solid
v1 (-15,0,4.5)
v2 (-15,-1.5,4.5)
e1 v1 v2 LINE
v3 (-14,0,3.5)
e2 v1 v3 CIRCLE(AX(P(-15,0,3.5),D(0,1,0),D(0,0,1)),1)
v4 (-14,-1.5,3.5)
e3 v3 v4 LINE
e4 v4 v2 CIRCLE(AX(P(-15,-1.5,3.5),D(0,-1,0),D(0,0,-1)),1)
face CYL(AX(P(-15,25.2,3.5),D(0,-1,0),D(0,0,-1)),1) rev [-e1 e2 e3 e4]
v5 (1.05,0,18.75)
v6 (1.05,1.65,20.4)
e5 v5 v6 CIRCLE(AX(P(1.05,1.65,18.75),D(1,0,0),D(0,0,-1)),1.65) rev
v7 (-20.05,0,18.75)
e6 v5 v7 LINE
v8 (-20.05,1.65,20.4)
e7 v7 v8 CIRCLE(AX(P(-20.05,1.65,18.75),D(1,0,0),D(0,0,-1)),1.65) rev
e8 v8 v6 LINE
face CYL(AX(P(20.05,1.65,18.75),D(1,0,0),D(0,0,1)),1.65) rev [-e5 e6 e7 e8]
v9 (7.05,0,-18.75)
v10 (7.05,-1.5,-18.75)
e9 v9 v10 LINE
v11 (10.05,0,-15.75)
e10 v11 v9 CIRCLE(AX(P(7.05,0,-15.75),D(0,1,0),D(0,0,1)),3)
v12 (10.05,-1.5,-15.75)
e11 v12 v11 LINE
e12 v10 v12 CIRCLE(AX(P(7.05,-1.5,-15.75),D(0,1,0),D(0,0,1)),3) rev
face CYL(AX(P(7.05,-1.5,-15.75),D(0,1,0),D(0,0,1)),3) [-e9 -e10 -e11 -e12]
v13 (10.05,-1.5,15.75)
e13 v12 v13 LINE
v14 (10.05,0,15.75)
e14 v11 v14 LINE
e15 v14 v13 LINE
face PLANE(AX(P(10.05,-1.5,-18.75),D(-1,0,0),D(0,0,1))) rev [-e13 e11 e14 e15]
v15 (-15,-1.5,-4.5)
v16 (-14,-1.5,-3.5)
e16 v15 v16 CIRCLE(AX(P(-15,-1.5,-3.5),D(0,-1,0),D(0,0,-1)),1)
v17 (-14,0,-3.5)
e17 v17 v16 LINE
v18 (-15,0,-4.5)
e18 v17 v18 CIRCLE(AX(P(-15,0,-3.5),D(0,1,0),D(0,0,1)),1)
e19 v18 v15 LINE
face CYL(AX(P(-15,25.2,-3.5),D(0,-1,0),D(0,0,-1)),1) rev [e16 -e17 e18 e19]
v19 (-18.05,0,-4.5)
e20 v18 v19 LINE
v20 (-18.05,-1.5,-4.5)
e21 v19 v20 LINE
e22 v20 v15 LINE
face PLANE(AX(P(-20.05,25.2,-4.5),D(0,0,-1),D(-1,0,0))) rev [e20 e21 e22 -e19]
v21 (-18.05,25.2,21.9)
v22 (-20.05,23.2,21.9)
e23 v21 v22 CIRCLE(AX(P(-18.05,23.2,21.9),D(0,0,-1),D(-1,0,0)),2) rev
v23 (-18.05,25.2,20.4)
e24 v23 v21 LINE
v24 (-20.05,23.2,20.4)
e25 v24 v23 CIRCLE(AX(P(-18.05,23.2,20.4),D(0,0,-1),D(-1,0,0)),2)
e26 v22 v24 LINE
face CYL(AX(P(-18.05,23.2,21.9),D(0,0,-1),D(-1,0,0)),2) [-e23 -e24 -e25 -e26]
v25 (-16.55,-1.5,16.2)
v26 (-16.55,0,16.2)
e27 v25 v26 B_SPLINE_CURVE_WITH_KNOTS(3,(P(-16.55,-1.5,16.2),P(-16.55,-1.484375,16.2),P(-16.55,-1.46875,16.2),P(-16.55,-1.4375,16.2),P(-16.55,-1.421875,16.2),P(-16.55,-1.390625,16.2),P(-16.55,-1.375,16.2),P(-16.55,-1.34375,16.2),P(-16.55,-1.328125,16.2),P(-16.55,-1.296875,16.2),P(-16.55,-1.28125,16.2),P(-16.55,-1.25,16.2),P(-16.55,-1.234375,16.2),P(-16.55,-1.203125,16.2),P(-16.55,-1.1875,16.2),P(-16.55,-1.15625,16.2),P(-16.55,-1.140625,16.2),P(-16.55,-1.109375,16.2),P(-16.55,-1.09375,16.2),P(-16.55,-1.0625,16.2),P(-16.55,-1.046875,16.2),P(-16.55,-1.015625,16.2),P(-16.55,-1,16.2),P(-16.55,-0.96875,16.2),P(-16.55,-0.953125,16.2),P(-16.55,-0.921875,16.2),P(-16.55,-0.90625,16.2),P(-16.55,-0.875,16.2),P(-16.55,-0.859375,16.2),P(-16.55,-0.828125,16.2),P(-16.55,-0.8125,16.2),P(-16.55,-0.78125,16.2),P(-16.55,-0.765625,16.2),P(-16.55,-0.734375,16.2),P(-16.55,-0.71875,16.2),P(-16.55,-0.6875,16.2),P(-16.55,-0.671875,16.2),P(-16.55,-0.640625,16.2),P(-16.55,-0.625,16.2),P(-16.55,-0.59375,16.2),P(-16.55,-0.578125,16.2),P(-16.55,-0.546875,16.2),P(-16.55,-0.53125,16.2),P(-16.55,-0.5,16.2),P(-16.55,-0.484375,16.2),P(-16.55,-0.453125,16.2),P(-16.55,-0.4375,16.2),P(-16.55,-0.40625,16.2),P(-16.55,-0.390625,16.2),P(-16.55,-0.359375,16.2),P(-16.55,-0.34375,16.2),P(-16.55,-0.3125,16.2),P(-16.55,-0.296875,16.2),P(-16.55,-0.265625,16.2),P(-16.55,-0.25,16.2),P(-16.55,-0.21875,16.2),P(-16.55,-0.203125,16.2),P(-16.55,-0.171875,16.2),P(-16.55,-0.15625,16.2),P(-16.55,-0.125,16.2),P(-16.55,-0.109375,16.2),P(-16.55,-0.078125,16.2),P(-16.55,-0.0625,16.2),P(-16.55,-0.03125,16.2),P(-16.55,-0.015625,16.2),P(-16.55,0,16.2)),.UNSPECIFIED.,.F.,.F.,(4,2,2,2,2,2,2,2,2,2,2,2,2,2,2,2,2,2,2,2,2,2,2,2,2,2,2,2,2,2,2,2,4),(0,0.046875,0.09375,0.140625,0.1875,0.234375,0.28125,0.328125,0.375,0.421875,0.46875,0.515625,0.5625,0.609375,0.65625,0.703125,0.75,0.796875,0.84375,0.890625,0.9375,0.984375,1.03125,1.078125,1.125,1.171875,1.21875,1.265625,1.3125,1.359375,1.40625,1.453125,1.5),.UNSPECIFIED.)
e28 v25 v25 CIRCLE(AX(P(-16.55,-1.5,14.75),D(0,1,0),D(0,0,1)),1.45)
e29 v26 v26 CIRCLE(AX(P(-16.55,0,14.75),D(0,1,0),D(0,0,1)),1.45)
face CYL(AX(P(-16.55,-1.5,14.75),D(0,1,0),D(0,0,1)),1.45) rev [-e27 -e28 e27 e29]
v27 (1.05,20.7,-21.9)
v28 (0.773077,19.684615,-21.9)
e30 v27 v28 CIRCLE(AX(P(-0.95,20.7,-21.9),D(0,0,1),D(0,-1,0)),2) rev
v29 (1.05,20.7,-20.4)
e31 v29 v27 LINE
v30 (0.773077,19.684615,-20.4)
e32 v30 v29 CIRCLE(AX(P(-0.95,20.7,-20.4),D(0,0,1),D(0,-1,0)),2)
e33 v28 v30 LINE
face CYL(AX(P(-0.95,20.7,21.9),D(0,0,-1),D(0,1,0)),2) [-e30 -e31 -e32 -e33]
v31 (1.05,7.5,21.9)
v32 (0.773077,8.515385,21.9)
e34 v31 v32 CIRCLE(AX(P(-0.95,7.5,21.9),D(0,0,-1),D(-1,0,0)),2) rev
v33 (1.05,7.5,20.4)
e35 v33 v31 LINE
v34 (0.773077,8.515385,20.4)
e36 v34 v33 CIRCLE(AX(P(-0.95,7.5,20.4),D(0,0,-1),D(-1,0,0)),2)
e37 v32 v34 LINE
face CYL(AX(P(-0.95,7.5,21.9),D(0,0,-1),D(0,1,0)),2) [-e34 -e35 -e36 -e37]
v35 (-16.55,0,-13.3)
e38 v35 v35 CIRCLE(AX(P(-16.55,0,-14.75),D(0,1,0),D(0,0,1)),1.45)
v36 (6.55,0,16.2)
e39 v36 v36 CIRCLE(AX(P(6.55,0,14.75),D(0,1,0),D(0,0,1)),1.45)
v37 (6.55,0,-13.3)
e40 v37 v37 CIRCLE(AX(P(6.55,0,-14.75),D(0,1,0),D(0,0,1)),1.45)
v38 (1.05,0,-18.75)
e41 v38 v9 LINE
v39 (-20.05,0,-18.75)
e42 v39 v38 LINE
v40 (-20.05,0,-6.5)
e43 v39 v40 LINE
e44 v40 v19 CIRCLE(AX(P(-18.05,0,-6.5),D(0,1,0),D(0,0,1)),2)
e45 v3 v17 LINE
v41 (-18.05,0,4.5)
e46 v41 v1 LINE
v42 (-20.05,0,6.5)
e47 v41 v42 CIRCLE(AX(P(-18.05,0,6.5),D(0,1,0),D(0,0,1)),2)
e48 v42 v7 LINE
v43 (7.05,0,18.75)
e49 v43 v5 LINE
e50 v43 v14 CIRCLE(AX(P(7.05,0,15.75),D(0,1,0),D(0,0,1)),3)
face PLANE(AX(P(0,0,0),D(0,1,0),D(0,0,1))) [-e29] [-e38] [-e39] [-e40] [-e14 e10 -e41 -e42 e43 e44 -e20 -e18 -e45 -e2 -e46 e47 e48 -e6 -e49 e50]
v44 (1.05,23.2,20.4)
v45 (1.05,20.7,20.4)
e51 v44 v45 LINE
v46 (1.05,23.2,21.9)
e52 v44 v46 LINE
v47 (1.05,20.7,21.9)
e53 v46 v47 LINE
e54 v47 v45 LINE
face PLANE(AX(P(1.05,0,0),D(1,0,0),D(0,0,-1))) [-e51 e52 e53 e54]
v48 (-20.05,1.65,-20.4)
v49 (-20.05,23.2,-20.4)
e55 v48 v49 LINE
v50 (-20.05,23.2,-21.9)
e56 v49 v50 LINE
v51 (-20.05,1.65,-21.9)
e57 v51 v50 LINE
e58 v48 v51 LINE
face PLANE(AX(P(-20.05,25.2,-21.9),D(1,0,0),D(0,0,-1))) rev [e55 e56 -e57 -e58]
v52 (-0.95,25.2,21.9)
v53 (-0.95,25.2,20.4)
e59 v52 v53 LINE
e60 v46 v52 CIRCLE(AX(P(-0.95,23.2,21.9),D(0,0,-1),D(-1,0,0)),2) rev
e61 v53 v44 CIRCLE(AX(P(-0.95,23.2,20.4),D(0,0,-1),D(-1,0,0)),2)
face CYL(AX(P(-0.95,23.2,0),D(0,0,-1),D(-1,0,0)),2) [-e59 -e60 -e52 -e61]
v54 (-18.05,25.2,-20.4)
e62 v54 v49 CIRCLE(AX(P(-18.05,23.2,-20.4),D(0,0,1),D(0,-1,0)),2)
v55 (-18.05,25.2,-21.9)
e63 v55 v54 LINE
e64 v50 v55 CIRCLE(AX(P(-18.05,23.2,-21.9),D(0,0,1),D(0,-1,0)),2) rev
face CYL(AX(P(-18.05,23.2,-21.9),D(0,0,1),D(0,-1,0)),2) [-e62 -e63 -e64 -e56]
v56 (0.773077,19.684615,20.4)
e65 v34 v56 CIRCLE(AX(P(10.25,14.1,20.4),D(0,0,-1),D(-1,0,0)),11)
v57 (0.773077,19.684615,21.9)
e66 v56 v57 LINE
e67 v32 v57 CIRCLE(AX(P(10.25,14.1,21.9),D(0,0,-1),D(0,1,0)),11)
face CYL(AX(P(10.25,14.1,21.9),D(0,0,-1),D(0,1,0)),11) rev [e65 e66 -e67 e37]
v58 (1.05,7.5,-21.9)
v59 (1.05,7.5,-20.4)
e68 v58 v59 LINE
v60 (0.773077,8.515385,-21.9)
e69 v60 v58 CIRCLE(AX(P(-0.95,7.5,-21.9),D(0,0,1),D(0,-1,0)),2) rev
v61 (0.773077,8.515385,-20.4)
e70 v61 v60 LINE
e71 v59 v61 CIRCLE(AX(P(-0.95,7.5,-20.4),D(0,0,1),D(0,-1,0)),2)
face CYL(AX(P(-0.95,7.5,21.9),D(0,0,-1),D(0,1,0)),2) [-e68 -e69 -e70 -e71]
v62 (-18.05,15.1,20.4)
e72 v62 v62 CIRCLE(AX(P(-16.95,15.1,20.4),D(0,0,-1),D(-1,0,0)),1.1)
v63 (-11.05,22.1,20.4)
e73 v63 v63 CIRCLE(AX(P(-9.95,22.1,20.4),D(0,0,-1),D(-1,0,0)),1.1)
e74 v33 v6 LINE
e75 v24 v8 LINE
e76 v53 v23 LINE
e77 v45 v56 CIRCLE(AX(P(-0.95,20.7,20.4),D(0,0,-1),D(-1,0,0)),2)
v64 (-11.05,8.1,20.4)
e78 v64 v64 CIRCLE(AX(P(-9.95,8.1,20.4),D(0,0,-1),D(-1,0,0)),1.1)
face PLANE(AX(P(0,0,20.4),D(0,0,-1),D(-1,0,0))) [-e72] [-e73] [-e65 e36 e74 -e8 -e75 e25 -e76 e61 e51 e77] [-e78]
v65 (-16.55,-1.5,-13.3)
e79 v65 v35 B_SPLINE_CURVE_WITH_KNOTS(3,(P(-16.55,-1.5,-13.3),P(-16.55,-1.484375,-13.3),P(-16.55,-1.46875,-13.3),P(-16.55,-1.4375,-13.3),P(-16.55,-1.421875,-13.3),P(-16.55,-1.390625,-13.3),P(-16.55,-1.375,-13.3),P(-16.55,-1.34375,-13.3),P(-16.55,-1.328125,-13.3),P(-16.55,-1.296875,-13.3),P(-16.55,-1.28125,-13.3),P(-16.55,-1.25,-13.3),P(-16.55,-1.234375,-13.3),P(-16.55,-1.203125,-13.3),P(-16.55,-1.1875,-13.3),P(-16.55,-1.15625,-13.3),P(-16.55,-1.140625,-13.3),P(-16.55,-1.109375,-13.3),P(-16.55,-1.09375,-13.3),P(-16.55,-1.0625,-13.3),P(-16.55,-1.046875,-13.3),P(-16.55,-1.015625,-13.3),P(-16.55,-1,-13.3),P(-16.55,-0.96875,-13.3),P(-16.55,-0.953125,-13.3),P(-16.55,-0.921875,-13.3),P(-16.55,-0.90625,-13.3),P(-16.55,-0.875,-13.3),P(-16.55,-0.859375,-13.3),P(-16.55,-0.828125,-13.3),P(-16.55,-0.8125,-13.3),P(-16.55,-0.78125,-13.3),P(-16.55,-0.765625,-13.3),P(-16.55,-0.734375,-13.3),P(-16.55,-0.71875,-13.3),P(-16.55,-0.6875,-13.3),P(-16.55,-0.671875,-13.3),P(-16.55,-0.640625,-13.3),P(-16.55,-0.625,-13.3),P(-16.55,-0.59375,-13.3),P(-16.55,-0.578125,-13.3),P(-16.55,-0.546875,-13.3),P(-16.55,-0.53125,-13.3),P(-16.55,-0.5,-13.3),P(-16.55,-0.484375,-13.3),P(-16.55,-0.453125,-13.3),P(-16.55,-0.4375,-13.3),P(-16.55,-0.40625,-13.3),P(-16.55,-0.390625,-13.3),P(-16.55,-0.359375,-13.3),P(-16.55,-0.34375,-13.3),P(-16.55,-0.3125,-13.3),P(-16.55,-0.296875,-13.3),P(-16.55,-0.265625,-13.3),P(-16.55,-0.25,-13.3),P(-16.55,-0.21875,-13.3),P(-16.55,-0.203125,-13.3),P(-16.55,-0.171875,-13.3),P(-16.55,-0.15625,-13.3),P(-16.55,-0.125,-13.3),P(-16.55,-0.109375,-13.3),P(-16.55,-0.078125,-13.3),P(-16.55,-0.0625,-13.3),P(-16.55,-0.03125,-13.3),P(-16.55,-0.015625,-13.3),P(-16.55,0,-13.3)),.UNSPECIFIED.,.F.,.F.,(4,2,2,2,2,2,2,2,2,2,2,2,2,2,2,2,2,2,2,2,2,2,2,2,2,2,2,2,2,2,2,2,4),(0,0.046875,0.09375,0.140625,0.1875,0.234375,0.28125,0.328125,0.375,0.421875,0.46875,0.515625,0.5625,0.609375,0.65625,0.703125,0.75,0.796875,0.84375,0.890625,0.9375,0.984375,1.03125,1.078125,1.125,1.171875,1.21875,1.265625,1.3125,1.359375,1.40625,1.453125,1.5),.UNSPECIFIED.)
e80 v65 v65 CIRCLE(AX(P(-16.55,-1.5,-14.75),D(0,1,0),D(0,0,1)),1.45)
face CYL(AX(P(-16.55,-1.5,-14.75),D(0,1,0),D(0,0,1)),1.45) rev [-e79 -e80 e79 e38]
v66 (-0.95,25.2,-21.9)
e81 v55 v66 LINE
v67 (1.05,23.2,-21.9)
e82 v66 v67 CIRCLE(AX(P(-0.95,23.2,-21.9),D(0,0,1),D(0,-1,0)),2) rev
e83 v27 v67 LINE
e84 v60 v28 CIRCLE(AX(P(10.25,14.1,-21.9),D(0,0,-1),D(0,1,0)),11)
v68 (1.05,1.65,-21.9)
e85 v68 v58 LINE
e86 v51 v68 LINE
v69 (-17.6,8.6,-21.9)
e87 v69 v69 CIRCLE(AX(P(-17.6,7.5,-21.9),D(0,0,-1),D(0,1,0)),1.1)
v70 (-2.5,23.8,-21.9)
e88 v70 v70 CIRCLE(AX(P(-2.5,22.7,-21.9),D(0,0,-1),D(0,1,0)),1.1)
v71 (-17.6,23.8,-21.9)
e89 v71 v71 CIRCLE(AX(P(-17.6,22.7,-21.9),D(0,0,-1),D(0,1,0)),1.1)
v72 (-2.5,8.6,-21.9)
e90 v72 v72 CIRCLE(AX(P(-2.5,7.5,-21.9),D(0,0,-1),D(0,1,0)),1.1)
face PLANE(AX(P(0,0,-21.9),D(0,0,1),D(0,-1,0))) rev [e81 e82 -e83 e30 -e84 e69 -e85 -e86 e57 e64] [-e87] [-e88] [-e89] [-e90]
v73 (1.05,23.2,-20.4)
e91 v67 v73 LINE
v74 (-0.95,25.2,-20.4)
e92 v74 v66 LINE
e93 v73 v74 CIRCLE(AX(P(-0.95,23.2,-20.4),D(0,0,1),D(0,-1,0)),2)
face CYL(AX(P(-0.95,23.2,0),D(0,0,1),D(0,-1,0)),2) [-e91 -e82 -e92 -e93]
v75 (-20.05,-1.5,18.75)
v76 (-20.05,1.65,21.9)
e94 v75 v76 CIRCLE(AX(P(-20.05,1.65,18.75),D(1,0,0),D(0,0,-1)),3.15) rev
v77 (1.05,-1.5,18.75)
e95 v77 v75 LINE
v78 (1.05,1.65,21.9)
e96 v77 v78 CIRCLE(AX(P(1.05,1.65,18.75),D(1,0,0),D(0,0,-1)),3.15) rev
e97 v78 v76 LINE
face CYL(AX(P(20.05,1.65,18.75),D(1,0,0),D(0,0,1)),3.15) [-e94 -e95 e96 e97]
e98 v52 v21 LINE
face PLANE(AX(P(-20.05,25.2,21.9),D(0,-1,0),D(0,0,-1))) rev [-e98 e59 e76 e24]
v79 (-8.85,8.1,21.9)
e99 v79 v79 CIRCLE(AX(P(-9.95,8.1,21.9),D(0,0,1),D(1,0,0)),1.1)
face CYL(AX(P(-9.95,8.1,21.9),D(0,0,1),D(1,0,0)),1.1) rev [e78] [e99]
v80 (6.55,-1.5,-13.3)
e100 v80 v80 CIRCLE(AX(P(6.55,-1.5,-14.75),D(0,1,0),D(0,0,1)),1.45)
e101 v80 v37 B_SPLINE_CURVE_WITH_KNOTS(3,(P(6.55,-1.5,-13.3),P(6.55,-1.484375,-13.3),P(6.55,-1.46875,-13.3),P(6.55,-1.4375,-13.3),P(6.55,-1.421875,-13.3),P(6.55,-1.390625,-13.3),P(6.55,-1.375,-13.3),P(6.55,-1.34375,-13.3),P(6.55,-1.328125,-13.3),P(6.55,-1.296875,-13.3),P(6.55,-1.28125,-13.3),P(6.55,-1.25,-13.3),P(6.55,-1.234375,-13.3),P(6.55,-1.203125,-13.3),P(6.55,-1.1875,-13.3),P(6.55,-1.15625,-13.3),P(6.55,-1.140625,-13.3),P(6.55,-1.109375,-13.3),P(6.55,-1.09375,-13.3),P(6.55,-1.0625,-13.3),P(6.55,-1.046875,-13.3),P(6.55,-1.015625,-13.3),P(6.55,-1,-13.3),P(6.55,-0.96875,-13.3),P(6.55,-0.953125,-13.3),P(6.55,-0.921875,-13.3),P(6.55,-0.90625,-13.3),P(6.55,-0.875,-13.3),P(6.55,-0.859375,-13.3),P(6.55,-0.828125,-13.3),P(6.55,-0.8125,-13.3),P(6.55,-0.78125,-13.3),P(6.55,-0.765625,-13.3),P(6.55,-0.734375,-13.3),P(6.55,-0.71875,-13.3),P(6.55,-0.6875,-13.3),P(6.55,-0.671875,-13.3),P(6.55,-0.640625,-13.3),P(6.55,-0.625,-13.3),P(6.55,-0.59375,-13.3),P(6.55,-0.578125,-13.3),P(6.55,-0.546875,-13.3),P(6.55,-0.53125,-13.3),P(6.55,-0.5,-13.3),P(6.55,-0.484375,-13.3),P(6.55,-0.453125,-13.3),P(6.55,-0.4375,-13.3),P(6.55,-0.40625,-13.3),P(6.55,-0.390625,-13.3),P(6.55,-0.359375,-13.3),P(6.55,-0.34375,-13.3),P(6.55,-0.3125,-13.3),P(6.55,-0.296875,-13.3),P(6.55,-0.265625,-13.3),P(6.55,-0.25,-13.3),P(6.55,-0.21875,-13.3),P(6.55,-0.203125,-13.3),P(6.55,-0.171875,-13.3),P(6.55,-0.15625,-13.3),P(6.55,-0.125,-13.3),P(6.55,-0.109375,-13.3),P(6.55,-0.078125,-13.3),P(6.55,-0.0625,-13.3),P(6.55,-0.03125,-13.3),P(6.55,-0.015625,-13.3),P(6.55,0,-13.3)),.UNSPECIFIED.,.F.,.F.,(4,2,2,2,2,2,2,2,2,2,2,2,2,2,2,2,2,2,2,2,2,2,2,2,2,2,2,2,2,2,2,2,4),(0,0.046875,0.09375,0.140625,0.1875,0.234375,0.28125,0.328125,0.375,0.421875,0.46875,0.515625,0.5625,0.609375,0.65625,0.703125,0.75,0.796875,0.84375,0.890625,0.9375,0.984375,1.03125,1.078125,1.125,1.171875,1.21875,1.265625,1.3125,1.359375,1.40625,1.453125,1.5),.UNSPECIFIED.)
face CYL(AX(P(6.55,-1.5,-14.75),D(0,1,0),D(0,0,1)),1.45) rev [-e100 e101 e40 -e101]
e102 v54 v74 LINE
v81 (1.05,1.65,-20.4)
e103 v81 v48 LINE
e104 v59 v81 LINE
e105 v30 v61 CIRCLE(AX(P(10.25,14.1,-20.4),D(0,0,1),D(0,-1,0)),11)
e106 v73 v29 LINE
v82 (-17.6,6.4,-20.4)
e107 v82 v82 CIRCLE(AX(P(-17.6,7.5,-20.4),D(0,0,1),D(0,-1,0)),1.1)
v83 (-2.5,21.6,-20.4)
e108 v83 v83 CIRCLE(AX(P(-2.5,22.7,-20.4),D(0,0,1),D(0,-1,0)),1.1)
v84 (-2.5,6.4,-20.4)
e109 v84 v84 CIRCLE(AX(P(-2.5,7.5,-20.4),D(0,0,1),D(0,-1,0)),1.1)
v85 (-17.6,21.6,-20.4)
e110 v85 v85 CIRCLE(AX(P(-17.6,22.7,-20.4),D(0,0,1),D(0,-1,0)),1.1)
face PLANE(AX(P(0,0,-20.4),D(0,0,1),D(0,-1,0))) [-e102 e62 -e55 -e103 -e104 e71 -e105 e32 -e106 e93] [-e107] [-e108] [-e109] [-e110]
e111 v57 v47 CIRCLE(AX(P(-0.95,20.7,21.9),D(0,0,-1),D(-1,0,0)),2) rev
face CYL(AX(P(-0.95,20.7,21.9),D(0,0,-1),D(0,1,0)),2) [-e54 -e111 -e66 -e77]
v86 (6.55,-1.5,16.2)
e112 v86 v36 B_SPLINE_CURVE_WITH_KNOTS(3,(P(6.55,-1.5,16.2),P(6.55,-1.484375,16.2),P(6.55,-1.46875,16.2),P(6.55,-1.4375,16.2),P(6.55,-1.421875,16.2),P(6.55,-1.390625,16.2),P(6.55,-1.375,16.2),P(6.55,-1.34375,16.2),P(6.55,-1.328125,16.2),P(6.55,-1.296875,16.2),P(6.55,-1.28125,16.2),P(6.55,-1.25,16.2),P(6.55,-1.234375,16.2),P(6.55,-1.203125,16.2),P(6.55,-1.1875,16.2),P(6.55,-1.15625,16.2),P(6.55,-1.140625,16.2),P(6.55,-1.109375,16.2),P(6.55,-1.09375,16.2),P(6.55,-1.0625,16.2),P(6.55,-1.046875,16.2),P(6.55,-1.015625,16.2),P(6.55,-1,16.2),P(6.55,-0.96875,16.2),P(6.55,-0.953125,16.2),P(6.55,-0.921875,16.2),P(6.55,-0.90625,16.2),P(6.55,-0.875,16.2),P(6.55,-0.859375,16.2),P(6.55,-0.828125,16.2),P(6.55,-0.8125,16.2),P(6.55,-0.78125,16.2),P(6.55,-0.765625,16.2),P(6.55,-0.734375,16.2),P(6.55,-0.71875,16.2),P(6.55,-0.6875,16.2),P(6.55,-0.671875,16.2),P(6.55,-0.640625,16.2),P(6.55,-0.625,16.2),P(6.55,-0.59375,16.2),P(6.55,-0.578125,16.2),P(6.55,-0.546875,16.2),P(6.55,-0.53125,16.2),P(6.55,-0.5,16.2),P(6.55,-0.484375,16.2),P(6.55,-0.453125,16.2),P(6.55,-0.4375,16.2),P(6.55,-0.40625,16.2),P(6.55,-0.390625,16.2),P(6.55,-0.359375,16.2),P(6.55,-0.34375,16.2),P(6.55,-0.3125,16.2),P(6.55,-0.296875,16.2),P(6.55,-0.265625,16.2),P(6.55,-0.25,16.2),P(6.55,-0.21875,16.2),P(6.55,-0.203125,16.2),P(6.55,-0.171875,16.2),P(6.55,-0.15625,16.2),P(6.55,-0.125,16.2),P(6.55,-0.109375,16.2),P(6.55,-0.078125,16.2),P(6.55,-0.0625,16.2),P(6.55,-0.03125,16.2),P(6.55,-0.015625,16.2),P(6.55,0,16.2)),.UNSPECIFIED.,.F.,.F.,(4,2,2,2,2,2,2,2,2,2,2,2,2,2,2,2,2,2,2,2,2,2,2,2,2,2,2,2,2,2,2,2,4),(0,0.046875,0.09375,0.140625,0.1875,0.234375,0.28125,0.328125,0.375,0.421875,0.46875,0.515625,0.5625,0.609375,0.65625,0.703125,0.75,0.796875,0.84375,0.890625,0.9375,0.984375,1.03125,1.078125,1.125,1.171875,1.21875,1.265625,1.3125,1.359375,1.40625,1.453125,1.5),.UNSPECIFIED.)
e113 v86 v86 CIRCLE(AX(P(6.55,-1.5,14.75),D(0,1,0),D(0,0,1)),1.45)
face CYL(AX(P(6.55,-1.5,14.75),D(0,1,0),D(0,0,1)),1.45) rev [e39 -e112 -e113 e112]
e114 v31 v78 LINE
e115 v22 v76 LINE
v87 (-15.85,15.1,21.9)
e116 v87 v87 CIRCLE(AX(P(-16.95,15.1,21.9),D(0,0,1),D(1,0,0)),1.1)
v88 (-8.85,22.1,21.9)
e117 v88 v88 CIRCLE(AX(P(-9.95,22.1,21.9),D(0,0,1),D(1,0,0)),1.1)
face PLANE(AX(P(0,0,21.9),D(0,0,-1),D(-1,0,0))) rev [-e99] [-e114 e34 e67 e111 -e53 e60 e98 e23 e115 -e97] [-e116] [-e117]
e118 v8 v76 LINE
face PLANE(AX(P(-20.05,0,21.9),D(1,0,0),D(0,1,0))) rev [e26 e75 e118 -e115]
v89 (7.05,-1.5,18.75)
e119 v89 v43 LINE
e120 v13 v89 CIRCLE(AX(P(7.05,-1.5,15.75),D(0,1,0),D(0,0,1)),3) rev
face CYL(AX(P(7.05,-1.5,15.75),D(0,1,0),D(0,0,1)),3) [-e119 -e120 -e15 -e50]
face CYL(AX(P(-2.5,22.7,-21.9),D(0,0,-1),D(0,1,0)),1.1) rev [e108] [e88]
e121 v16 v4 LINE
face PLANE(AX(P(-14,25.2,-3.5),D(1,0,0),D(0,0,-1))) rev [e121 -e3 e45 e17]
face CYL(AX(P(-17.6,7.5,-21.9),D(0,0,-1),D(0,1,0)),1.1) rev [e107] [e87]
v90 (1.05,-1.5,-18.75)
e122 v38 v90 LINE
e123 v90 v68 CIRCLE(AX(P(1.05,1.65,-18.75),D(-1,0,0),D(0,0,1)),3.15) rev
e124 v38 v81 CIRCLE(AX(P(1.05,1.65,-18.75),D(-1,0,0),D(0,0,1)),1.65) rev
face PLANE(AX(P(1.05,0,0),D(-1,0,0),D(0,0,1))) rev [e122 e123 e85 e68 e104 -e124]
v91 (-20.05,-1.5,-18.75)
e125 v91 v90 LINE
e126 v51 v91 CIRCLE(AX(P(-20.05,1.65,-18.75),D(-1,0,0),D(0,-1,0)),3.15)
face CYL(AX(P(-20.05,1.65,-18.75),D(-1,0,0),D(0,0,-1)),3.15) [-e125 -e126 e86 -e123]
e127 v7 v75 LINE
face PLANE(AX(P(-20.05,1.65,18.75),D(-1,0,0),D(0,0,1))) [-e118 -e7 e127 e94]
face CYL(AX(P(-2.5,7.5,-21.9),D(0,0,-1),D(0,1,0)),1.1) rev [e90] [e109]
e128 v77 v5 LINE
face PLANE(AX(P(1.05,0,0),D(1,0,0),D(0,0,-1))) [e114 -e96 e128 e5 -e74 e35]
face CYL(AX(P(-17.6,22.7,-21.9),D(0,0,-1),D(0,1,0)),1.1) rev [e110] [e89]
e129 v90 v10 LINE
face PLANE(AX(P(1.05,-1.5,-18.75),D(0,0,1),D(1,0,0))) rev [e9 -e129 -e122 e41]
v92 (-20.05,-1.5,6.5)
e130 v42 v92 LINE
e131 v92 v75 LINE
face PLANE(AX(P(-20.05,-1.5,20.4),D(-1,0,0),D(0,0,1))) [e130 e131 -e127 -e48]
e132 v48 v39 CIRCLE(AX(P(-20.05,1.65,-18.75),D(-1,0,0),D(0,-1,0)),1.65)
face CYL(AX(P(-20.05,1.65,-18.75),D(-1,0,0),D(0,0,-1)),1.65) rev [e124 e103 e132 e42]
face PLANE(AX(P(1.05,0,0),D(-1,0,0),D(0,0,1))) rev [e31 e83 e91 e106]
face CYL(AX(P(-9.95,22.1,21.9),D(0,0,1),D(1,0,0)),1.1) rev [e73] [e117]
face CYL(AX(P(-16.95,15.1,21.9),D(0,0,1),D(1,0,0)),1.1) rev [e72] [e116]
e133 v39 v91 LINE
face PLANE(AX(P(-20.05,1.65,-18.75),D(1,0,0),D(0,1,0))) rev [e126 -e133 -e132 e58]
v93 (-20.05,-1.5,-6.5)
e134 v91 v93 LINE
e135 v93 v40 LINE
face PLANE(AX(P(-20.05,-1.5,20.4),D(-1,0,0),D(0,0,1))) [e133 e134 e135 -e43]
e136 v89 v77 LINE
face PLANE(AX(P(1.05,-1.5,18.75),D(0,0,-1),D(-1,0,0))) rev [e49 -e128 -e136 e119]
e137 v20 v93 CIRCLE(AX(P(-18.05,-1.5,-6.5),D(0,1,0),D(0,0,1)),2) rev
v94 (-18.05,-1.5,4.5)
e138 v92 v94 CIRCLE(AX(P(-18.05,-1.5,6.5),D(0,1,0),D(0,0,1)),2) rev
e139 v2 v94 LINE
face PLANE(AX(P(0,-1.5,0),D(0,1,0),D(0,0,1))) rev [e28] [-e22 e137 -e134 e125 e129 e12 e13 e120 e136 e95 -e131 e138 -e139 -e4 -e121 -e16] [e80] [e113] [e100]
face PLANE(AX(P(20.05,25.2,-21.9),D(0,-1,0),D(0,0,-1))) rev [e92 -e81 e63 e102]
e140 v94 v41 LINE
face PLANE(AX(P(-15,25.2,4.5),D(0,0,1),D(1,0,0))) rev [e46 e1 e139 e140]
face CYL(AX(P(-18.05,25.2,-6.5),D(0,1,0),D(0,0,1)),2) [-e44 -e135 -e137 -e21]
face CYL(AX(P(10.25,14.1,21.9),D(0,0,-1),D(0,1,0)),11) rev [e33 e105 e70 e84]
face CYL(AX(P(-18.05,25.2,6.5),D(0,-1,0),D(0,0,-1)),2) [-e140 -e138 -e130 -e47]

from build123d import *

# Parameters (mm, degrees)
SKETCH1_W                      = 40.1
SKETCH1_H                      = 40.8
BASE_FLANGE1_DEPTH             = 1.5
EDGE_FLANGE2_STRIP_W           = 9.3
EDGE_FLANGE2_STRIP_H           = 1.5
EDGE_FLANGE2_STRIP_CUT_DEPTH   = 40.1
EDGE_FLANGE2_STRIP_2_W         = 9.3
EDGE_FLANGE2_STRIP_2_H         = 1.5
EDGE_FLANGE2_STRIP_CUT_2_DEPTH = 40.1
EDGE_FLANGE2_DEPTH             = 40.1
EDGE_FLANGE2_BEND_DEPTH        = 40.1
SKETCH23_W                     = 3.15
SKETCH23_H                     = 26.7
CUT_EXTRUDE3_DEPTH             = 19
SKETCH24_R                     = 11
CUT_EXTRUDE4_DEPTH             = 55.364349532
SKETCH26_W                     = 10
SKETCH26_H                     = 37.5
CUT_EXTRUDE5_DEPTH             = 39.944222935
SKETCH27_R                     = 1.45
CUT_EXTRUDE6_DEPTH             = 39.944222935
FILLET1_R                      = 3
FILLET2_R                      = 2
F_2_0MM_DOWEL_HOLE1_D          = 2.2
F_2_0MM_DOWEL_HOLE1_DEPTH      = 1.5
F_2_0MM_DOWEL_HOLE2_D          = 2.2
F_2_0MM_DOWEL_HOLE2_DEPTH      = 1.5
CUT_EXTRUDE7_DEPTH             = 40.93122212
FILLET3_R                      = 2


# Sheet-metal steps are written as plain solids
with BuildPart() as part:
    # Sketch1 → Base-Flange1 (new body)
    with BuildSketch(Plane(origin=(0, 0, 0), x_dir=(1, 0, 0), z_dir=(0, 1, 0))):
        Rectangle(SKETCH1_W, SKETCH1_H)
    extrude(amount=-BASE_FLANGE1_DEPTH)

    # Edge-Flange2 strip (across the edge) → Edge-Flange2 strip cut (cut)
    with BuildSketch(Plane(origin=(-20.05, 0, 20.4), x_dir=(0, 0, -1), z_dir=(1, 0, 0))):
        with Locations((-3, -0.75)):
            Rectangle(EDGE_FLANGE2_STRIP_W, EDGE_FLANGE2_STRIP_H)
    extrude(amount=EDGE_FLANGE2_STRIP_CUT_DEPTH, mode=Mode.SUBTRACT)

    # Edge-Flange2 strip 2 (across the edge) → Edge-Flange2 strip cut 2 (cut)
    with BuildSketch(Plane(origin=(20.05, 0, -20.4), x_dir=(0, 0, 1), z_dir=(-1, 0, 0))):
        with Locations((-3, -0.75)):
            Rectangle(EDGE_FLANGE2_STRIP_2_W, EDGE_FLANGE2_STRIP_2_H)
    extrude(amount=EDGE_FLANGE2_STRIP_CUT_2_DEPTH, mode=Mode.SUBTRACT)

    # Edge-Flange2 section (across the edge) → Edge-Flange2 (add)
    with BuildSketch(Plane(origin=(-20.05, 0, 20.4), x_dir=(0, 0, -1), z_dir=(1, 0, 0))):
        with BuildLine():
            Line((-1.5, 1.65), (-1.5, 25.2))
            Line((-1.5, 25.2), (0, 25.2))
            Line((0, 25.2), (0, 1.65))
            ThreePointArc((0, 1.65), (0.483273811, 0.483273811), (1.65, 0))
            Line((1.65, 0), (1.65, -1.5))
            ThreePointArc((1.65, -1.5), (-0.577386361, -0.577386361), (-1.5, 1.65))
        make_face()
    extrude(amount=EDGE_FLANGE2_DEPTH)

    # Edge-Flange2 section 2 (across the edge) → Edge-Flange2 bend (add)
    with BuildSketch(Plane(origin=(20.05, 0, -20.4), x_dir=(0, 0, 1), z_dir=(-1, 0, 0))):
        with BuildLine():
            Line((-1.5, 1.65), (-1.5, 25.2))
            Line((-1.5, 25.2), (0, 25.2))
            Line((0, 25.2), (0, 1.65))
            ThreePointArc((0, 1.65), (0.483273811, 0.483273811), (1.65, 0))
            Line((1.65, 0), (1.65, -1.5))
            ThreePointArc((1.65, -1.5), (-0.577386361, -0.577386361), (-1.5, 1.65))
        make_face()
    extrude(amount=EDGE_FLANGE2_BEND_DEPTH)

    # Sketch23 → Cut-Extrude3 (cut)
    with BuildSketch(Plane(origin=(20.05, 0, 0), x_dir=(0, 0, -1), z_dir=(1, 0, 0))):
        with Locations((-20.325, 11.85)):
            Rectangle(SKETCH23_W, SKETCH23_H)
        with Locations((20.325, 11.85)):
            Rectangle(SKETCH23_W, SKETCH23_H)
    extrude(amount=-CUT_EXTRUDE3_DEPTH, mode=Mode.SUBTRACT)

    # Sketch24 → Cut-Extrude4 (cut, through all)
    with BuildSketch(Plane(origin=(0, 0, -21.9), x_dir=(-1, 0, 0), z_dir=(0, 0, -1))):
        with Locations((-10.25, 14.1)):
            Circle(SKETCH24_R)
    extrude(amount=-CUT_EXTRUDE4_DEPTH, mode=Mode.SUBTRACT)

    # Sketch26 → Cut-Extrude5 (cut, through all)
    with BuildSketch(Plane(origin=(0, 0, 0), x_dir=(1, 0, 0), z_dir=(0, 1, 0))):
        with Locations((15.05, 0)):
            Rectangle(SKETCH26_W, SKETCH26_H)
    extrude(amount=-CUT_EXTRUDE5_DEPTH, mode=Mode.SUBTRACT)

    # Sketch27 → Cut-Extrude6 (cut, through all)
    with BuildSketch(Plane(origin=(0, 0, 0), x_dir=(1, 0, 0), z_dir=(0, 1, 0))):
        with Locations(Location((-16.55, 14.75, 0), (0, 0, 270))):
            Circle(SKETCH27_R)
        with Locations(Location((6.55, 14.75, 0), (0, 0, 270))):
            Circle(SKETCH27_R)
        with Locations(Location((6.55, -14.75, 0), (0, 0, 270))):
            Circle(SKETCH27_R)
        with Locations(Location((-16.55, -14.75, 0), (0, 0, 270))):
            Circle(SKETCH27_R)
    extrude(amount=-CUT_EXTRUDE6_DEPTH, mode=Mode.SUBTRACT)

    # Fillet1
    fillet1_edges = [part.edges().sort_by_distance(p)[0] for p in [
        (10.05, -0.75, 18.75),
        (10.05, -0.75, -18.75),
    ]]
    fillet(fillet1_edges, radius=FILLET1_R)

    # Fillet2
    fillet2_edges = [part.edges().sort_by_distance(p)[0] for p in [
        (1.05, 25.2, -21.15),
        (1.05, 20.129925373, 21.15),
        (1.05, 8.070074627, 21.15),
        (1.05, 20.129925373, -21.15),
        (1.05, 8.070074627, -21.15),
        (-20.05, 25.2, 21.15),
        (-20.05, 25.2, -21.15),
        (1.05, 25.2, 21.15),
    ]]
    fillet(fillet2_edges, radius=FILLET2_R)

    # Ø2.0mm Dowel Hole1
    with Locations(Plane(origin=(0, 0, -21.9), x_dir=(-1, 0, 0), z_dir=(0, 0, -1))):
        with Locations((2.5, 22.7), (17.6, 22.7), (2.5, 7.5), (17.6, 7.5)):
            Hole(F_2_0MM_DOWEL_HOLE1_D / 2, depth=F_2_0MM_DOWEL_HOLE1_DEPTH)

    # Ø2.0mm Dowel Hole2
    with Locations(Plane.XY.offset(21.9)):
        with Locations((-16.95, 15.1), (-9.95, 22.1), (-9.95, 8.1)):
            Hole(F_2_0MM_DOWEL_HOLE2_D / 2, depth=F_2_0MM_DOWEL_HOLE2_DEPTH)

    # Sketch32 → Cut-Extrude7 (cut, through all)
    with BuildSketch(Plane.XZ.offset(1.5)):
        with BuildLine():
            Line((-20.05, 4.5), (-20.05, -4.5))
            Line((-20.05, -4.5), (-15, -4.5))
            ThreePointArc((-15, -4.5), (-14.292893219, -4.207106781), (-14, -3.5))
            Line((-14, -3.5), (-14, 3.5))
            ThreePointArc((-14, 3.5), (-14.292893219, 4.207106781), (-15, 4.5))
            Line((-15, 4.5), (-20.05, 4.5))
        make_face()
    extrude(amount=-CUT_EXTRUDE7_DEPTH, mode=Mode.SUBTRACT)

    # Fillet3
    fillet3_edges = [part.edges().sort_by_distance(p)[0] for p in [
        (-20.05, -0.75, -4.5),
        (-20.05, -0.75, 4.5),
    ]]
    fillet(fillet3_edges, radius=FILLET3_R)


solid = part.part
